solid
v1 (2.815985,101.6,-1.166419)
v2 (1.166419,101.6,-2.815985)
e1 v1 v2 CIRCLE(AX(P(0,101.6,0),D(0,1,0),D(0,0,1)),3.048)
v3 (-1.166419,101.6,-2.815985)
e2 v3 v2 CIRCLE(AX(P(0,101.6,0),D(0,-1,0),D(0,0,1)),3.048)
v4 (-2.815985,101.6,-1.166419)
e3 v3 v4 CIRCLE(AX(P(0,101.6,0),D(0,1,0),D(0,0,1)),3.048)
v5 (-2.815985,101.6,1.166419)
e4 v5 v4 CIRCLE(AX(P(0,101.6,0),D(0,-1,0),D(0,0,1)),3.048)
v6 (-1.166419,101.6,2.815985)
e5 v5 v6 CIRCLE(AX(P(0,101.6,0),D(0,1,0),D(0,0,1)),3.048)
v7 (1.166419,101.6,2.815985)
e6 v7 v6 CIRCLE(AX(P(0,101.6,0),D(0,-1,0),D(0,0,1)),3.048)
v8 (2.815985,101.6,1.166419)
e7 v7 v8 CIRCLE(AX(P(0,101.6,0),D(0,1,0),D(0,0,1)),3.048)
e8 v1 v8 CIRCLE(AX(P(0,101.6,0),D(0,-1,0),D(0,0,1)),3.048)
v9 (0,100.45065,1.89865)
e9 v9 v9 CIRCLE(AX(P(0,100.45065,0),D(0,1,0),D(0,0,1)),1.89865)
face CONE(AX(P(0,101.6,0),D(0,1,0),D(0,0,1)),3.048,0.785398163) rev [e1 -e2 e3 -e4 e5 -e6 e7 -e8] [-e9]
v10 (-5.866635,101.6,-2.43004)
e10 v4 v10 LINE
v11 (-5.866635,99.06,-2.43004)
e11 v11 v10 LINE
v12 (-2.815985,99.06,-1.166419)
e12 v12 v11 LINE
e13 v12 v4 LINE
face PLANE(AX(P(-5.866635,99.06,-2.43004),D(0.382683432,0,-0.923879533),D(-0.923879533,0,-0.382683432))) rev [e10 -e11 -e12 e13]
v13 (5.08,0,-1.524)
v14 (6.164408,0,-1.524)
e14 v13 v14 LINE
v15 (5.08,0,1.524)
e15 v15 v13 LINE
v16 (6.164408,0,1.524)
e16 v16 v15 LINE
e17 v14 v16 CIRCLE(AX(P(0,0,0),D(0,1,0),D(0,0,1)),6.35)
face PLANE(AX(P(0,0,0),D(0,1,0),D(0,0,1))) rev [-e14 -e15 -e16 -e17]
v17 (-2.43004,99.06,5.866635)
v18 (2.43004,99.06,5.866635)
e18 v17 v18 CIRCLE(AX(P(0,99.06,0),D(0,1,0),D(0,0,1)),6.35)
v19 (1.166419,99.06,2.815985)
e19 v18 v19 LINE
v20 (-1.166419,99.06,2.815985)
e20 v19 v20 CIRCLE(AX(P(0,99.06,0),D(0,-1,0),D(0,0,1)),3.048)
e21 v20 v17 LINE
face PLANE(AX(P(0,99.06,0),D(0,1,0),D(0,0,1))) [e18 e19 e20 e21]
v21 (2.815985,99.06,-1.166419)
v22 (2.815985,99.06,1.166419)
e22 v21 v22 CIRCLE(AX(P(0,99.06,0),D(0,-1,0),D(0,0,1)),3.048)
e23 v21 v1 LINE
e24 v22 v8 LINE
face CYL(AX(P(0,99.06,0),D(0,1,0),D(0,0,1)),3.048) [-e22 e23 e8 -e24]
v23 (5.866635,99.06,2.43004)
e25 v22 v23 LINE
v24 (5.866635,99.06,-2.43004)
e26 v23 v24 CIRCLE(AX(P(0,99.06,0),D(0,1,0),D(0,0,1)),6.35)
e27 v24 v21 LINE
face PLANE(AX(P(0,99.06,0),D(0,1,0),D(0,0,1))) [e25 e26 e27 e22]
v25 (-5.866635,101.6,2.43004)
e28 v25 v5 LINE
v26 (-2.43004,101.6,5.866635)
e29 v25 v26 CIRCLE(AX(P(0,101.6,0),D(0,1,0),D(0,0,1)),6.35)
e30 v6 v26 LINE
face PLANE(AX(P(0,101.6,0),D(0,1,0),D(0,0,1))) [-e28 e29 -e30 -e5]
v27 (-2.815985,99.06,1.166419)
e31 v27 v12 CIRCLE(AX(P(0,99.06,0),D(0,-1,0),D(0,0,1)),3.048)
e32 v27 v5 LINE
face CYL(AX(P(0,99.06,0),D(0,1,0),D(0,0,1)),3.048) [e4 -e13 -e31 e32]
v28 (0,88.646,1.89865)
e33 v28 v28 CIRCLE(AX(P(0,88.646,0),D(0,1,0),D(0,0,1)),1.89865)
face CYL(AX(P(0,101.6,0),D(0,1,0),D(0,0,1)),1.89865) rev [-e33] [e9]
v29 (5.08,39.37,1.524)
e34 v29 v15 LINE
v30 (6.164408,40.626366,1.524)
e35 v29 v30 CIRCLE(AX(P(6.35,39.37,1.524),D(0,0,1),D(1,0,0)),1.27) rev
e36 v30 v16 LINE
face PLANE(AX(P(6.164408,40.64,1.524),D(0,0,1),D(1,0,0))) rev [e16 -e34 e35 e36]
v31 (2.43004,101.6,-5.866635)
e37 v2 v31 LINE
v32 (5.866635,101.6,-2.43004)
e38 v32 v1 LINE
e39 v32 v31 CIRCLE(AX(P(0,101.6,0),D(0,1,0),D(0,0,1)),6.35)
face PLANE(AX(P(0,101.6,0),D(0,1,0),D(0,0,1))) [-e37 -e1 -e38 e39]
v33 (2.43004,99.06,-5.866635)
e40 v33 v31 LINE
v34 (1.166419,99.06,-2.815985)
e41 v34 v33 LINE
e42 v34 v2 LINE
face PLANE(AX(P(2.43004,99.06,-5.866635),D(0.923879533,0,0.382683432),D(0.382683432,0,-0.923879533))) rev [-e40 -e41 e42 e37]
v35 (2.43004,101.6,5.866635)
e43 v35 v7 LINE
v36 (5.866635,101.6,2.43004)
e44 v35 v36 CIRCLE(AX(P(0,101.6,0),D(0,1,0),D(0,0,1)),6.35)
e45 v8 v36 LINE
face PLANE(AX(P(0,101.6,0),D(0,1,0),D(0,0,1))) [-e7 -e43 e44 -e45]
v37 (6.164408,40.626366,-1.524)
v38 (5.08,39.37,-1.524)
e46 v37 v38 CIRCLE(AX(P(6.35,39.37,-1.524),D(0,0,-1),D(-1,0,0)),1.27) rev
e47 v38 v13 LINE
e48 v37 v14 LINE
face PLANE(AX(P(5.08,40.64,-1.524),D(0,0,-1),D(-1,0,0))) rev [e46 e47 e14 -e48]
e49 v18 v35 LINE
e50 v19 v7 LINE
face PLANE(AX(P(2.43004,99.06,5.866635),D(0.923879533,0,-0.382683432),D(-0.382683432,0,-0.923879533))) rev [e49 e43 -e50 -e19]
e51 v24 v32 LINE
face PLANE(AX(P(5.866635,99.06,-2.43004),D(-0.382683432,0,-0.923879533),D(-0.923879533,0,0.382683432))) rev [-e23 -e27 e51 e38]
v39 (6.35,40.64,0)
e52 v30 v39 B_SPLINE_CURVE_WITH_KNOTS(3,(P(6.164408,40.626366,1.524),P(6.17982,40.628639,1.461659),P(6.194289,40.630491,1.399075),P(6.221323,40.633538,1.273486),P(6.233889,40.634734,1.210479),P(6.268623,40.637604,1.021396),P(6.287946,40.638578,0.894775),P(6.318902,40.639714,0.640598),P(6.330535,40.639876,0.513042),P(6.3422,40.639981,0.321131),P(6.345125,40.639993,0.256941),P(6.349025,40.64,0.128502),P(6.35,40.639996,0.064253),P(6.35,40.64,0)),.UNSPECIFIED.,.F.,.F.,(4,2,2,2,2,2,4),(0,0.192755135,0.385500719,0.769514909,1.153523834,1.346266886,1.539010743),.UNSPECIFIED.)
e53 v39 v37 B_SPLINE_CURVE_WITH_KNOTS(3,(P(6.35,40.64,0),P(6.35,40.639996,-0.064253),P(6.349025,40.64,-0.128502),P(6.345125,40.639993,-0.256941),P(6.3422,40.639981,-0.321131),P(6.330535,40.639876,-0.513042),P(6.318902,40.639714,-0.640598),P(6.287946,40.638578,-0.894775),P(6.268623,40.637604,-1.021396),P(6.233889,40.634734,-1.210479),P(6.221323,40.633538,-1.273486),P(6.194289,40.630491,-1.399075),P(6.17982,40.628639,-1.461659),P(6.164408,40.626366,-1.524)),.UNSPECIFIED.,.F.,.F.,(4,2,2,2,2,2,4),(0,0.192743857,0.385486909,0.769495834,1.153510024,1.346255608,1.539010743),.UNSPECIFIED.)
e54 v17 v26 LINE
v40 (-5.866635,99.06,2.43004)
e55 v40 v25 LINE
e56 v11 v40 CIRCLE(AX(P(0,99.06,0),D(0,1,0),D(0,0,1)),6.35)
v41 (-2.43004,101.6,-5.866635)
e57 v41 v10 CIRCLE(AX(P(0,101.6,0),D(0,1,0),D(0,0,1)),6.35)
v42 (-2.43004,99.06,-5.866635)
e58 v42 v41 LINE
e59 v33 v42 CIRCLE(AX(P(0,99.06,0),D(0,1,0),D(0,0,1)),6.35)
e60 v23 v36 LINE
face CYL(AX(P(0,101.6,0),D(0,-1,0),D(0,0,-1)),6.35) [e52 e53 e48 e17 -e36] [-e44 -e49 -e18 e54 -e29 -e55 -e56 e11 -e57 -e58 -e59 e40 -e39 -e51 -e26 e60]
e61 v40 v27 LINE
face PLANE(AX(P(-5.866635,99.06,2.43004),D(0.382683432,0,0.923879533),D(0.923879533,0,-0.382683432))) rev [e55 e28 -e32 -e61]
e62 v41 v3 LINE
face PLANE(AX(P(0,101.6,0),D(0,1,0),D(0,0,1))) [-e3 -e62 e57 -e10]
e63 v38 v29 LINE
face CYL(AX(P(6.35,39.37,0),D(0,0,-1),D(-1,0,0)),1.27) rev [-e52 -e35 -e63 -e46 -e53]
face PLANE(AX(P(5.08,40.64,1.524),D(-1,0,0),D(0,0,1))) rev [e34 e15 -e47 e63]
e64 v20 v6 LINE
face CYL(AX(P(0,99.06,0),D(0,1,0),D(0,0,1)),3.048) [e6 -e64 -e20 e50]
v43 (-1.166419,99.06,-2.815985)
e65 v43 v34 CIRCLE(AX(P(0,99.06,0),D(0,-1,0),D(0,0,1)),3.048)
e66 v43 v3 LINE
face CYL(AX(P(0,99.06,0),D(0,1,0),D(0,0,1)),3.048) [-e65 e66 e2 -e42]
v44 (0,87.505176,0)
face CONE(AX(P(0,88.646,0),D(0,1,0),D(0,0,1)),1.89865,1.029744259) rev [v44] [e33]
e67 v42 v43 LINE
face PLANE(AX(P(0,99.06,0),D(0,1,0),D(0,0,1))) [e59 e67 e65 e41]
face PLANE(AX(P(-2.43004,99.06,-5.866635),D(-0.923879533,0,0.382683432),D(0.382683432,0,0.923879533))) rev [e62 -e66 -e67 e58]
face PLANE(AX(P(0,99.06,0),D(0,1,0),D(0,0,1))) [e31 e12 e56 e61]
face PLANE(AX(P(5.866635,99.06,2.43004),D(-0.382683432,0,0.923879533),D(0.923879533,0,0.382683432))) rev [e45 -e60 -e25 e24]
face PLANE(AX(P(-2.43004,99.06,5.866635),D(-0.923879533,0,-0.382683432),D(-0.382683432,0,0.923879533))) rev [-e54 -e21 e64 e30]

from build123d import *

# Parameters (mm, degrees)
SKETCH1_R                        = 6.35
BOSS_EXTRUDE1_DEPTH              = 101.6
CUT_EXTRUDE1_DEPTH               = 40.64
FILLET1_R                        = 1.27
F_10_24_TAPPED_HOLE1_D           = 3.7973
F_10_24_TAPPED_HOLE1_DEPTH       = 12.954
F_10_24_TAPPED_HOLE1_CSINK_D     = 6.096
F_10_24_TAPPED_HOLE1_CSINK_ANGLE = 90
F_10_24_TAPPED_HOLE1_TIP         = 1.140824014
CUT_EXTRUDE3_START               = -2.54
CUT_EXTRUDE3_DEPTH               = 2.54


with BuildPart() as part:
    # Sketch1 → Boss-Extrude1 (new body)
    with BuildSketch(Plane(origin=(0, 0, 0), x_dir=(1, 0, 0), z_dir=(0, 1, 0))):
        with Locations(Location((0, 0, 0), (0, 0, 270))):
            Circle(SKETCH1_R)
    extrude(amount=BOSS_EXTRUDE1_DEPTH)

    # Sketch2 → Cut-Extrude1 (cut)
    with BuildSketch(Plane(origin=(0, 0, 0), x_dir=(-1, 0, 0), z_dir=(0, -1, 0))):
        with BuildLine():
            Line((-6.164407839, -1.524), (-5.08, -1.524))
            Line((-5.08, -1.524), (-5.08, 1.524))
            Line((-5.08, 1.524), (-6.164407839, 1.524))
            ThreePointArc((-6.164407839, 1.524), (-6.35, 0), (-6.164407839, -1.524))
        make_face()
    extrude(amount=-CUT_EXTRUDE1_DEPTH, mode=Mode.SUBTRACT)

    # Fillet1
    fillet1_edges = [part.edges().sort_by_distance(p)[0] for p in [
        (5.08, 40.64, 0),
    ]]
    fillet(fillet1_edges, radius=FILLET1_R - 0.0001)  # a hair under: the kernel refuses the full size

    # #10-24 Tapped Hole1
    with Locations(Plane(origin=(0, 101.6, 0), x_dir=(1, 0, 0), z_dir=(0, 1, 0))):
        with Locations((0, 0)):
            CounterSinkHole(F_10_24_TAPPED_HOLE1_D / 2, F_10_24_TAPPED_HOLE1_CSINK_D / 2, depth=F_10_24_TAPPED_HOLE1_DEPTH, counter_sink_angle=F_10_24_TAPPED_HOLE1_CSINK_ANGLE)
            with Locations((0, 0, -(F_10_24_TAPPED_HOLE1_DEPTH + F_10_24_TAPPED_HOLE1_TIP / 2))):  # 118° drill point
                Cone(0, F_10_24_TAPPED_HOLE1_D / 2, F_10_24_TAPPED_HOLE1_TIP, mode=Mode.SUBTRACT)

    # Sketch6 → Cut-Extrude3 (cut)
    with BuildSketch(Plane(origin=(0, 101.6, 0), x_dir=(1, 0, 0), z_dir=(0, 1, 0)).offset(CUT_EXTRUDE3_START)):
        with BuildLine():
            Line((2.430039796, -5.866635031), (1.166419102, -2.815984815))
            ThreePointArc((1.166419102, -2.815984815), (0, -3.048), (-1.166419102, -2.815984815))
            Line((-1.166419102, -2.815984815), (-2.430039796, -5.866635031))
            ThreePointArc((-2.430039796, -5.866635031), (0, -6.35), (2.430039796, -5.866635031))
        make_face()
        with BuildLine():
            Line((-5.866635031, 2.430039796), (-2.815984815, 1.166419102))
            ThreePointArc((-2.815984815, 1.166419102), (-3.048, 0), (-2.815984815, -1.166419102))
            Line((-2.815984815, -1.166419102), (-5.866635031, -2.430039796))
            ThreePointArc((-5.866635031, -2.430039796), (-6.35, 0), (-5.866635031, 2.430039796))
        make_face()
        with BuildLine():
            Line((2.430039796, 5.866635031), (1.166419102, 2.815984815))
            ThreePointArc((1.166419102, 2.815984815), (0, 3.048), (-1.166419102, 2.815984815))
            Line((-1.166419102, 2.815984815), (-2.430039796, 5.866635031))
            ThreePointArc((-2.430039796, 5.866635031), (0, 6.35), (2.430039796, 5.866635031))
        make_face()
        with BuildLine():
            Line((5.866635031, -2.430039796), (2.815984815, -1.166419102))
            ThreePointArc((2.815984815, -1.166419102), (3.048, 0), (2.815984815, 1.166419102))
            Line((2.815984815, 1.166419102), (5.866635031, 2.430039796))
            ThreePointArc((5.866635031, 2.430039796), (6.35, 0), (5.866635031, -2.430039796))
        make_face()
    extrude(amount=CUT_EXTRUDE3_DEPTH, mode=Mode.SUBTRACT)


solid = part.part
